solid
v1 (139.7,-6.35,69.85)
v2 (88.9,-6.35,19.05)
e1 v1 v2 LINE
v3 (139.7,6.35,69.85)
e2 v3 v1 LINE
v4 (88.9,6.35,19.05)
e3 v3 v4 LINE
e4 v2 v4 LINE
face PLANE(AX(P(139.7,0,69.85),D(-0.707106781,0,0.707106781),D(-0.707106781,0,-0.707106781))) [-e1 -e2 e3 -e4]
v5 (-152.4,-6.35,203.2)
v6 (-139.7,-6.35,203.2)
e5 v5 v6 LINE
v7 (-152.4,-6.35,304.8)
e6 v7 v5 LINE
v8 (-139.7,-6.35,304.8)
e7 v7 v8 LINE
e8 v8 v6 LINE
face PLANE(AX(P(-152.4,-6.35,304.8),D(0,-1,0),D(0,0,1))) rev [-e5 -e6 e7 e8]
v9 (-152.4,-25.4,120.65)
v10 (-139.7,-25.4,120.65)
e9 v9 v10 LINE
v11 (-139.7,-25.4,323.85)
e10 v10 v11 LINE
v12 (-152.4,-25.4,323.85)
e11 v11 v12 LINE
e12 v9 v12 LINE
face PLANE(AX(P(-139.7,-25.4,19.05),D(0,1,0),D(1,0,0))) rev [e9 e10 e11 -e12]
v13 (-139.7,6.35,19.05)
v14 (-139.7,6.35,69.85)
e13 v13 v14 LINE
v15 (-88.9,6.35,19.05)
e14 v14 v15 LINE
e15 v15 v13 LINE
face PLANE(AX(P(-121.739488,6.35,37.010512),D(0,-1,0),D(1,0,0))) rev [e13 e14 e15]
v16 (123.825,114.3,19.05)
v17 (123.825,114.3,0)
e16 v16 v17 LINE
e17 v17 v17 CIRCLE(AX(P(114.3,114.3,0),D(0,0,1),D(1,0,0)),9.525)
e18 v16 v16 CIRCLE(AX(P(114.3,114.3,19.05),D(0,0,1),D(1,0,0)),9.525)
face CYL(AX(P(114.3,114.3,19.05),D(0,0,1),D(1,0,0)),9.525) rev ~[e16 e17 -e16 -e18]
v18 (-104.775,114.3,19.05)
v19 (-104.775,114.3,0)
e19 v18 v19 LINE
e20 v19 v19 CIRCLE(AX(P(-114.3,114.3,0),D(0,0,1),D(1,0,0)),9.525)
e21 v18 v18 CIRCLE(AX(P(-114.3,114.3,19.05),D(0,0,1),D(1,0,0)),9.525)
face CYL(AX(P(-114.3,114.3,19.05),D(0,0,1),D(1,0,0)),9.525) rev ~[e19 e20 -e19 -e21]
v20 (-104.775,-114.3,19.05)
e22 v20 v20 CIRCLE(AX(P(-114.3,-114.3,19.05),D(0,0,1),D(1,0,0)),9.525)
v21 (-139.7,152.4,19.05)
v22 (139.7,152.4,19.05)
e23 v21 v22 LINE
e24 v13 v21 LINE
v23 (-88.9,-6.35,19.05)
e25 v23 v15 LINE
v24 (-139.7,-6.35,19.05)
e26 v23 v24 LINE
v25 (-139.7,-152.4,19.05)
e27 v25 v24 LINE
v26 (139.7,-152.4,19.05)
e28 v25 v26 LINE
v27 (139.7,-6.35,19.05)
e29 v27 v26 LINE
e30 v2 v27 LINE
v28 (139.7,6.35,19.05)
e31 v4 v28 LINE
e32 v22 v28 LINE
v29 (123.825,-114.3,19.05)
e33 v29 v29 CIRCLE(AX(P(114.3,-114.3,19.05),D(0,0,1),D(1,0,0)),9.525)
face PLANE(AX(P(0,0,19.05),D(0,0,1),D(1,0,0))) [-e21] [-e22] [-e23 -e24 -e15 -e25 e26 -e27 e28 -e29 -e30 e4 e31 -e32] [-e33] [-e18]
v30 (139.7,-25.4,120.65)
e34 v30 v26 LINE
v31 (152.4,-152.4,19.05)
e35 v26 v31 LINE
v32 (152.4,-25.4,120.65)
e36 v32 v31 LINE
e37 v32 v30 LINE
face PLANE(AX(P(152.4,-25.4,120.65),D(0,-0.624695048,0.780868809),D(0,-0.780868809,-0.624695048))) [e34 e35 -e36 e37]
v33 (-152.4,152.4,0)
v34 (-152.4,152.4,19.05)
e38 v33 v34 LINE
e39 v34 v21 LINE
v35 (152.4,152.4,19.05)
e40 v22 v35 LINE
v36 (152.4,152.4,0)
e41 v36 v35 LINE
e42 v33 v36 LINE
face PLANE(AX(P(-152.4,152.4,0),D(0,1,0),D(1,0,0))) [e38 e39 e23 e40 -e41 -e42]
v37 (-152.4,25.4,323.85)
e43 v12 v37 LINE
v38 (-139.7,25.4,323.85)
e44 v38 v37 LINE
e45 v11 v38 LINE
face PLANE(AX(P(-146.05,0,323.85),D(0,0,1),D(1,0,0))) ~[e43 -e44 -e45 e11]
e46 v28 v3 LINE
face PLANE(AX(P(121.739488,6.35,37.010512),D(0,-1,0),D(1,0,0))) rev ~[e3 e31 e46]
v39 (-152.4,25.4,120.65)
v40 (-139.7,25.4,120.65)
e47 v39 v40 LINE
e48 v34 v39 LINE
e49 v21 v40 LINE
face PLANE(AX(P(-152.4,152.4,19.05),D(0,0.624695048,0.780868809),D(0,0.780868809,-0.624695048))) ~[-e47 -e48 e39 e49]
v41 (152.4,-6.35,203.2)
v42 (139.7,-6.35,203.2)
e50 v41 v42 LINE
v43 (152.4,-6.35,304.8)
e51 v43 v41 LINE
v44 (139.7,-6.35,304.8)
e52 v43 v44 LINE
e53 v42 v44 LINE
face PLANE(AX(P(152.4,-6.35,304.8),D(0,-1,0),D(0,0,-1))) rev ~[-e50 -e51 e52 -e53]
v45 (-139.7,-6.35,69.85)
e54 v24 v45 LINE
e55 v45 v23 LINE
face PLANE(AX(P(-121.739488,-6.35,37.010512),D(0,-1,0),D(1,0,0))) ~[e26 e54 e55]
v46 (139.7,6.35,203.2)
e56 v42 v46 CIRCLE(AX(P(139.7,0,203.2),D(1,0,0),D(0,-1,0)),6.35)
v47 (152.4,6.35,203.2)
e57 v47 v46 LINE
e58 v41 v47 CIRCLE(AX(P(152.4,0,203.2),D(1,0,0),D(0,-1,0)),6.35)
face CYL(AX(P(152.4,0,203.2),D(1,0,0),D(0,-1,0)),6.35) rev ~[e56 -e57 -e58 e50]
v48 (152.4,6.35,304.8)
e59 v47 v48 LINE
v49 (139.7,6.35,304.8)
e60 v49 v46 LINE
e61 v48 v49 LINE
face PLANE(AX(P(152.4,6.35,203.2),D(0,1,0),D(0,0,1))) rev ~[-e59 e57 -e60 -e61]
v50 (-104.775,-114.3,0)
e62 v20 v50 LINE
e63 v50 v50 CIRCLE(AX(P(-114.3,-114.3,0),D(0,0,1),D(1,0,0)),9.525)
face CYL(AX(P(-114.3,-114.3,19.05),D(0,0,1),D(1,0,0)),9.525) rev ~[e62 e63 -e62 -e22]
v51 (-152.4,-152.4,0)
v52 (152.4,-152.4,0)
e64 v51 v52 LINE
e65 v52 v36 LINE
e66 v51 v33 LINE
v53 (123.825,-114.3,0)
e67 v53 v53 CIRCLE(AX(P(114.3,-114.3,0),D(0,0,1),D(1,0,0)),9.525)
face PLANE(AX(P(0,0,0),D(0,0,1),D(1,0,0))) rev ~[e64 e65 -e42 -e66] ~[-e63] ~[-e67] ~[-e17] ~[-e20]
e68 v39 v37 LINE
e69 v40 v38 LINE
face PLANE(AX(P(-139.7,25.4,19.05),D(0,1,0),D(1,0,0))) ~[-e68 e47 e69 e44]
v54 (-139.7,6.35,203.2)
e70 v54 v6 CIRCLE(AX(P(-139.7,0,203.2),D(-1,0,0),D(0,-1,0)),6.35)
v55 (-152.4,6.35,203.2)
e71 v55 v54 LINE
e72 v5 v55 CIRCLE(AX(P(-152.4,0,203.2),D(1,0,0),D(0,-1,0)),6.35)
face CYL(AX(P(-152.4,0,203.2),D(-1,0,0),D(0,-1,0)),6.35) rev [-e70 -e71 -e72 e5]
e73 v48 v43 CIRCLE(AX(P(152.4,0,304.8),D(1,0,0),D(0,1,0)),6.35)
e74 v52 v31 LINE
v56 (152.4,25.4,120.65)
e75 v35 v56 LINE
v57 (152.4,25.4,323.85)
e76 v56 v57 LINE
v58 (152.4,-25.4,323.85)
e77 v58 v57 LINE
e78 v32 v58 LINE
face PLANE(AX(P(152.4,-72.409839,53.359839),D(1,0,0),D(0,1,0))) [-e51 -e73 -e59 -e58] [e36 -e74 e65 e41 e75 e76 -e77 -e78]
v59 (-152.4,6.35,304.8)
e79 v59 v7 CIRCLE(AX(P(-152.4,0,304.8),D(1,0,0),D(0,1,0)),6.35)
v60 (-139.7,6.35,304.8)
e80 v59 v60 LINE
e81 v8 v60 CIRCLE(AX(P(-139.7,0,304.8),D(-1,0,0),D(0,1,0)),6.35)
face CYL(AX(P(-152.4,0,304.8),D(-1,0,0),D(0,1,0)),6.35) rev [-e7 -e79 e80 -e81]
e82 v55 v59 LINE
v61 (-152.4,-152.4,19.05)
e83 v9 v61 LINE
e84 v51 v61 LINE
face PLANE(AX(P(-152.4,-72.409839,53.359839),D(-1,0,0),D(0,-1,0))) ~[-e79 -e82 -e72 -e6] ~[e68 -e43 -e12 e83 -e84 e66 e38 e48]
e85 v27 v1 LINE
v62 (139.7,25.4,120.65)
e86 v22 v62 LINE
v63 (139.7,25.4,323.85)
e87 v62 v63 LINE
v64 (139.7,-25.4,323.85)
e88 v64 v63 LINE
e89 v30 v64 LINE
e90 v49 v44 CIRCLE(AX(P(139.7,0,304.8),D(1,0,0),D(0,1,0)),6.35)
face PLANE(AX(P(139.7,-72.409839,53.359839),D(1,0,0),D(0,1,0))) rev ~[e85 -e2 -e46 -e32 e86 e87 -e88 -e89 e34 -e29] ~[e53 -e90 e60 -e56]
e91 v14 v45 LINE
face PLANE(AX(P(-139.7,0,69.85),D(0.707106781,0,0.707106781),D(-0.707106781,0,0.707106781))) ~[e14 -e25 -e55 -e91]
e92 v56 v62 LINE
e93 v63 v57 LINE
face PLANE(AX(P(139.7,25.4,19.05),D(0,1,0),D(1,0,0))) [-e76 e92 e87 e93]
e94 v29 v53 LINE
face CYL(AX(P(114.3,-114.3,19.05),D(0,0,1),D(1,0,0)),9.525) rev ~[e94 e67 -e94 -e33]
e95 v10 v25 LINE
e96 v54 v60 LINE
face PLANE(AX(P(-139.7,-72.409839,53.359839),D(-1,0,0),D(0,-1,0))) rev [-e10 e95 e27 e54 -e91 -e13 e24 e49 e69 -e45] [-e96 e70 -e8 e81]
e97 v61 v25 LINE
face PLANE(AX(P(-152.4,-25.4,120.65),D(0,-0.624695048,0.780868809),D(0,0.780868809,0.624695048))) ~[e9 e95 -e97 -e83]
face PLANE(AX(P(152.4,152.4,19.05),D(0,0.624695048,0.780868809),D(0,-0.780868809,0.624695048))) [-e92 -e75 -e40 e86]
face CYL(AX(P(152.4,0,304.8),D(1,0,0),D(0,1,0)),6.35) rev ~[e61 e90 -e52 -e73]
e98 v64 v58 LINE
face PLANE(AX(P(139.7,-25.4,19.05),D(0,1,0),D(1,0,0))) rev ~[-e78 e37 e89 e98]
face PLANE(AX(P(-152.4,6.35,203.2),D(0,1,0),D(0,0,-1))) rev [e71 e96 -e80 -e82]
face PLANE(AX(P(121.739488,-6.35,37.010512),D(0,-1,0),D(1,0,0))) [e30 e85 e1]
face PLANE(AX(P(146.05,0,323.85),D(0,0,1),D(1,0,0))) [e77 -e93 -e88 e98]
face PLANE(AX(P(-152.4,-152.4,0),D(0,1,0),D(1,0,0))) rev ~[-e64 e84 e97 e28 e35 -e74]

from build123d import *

# Parameters (mm, degrees)
F0_W      = 304.8
F0_H      = 304.8
F1_DEPTH  = 19.05
F2_W      = 12.7
F2_H      = 50.8
F3_DEPTH  = 304.8
F5_DEPTH  = 25.4
F7_DEPTH  = 6.35
F9_DEPTH  = 12.7
F10_R     = 9.525
F11_DEPTH = 25.4


# Not quite as in the source:
# - a pattern or mirror of a feature is missing from the dataset's text; its kind, count and spacing are read off the source's solid


with BuildPart() as f1:
    # F0 (on Top) → F1 (new body)
    with BuildSketch(Plane.XY):
        Rectangle(F0_W, F0_H)
    extrude(amount=F1_DEPTH)

    # F2 (on face) → F3 (join)
    with BuildSketch(Plane.XY.offset(19.05)):
        with Locations((146.05, 0)):
            Rectangle(F2_W, F2_H)
    f3 = extrude(amount=F3_DEPTH)

    # F3_copies: F3 across plane
    add(f3.mirror(Plane(origin=(0, 0, 0), x_dir=(0, 0, -1), z_dir=(-1, 0, 0))))

    # F4 (on face) → F5 (cut)
    with BuildSketch(Plane.YZ.offset(152.4)):
        with BuildLine():
            Line((6.35, 203.2), (6.35, 304.8))
            ThreePointArc((6.35, 304.8), (0, 311.15), (-6.35, 304.8))
            Line((-6.35, 304.8), (-6.35, 203.2))
            ThreePointArc((-6.35, 203.2), (0, 196.85), (6.35, 203.2))
        make_face()
    f5 = extrude(amount=-F5_DEPTH, mode=Mode.SUBTRACT)

    # F5_copies: F5 across plane
    add(f5.mirror(Plane(origin=(0, 0, 0), x_dir=(0, 0, -1), z_dir=(-1, 0, 0))), mode=Mode.SUBTRACT)

    # F6 (on Front) → F7 (join, symmetric)
    with BuildSketch(Plane.XZ):
        Polygon((139.7, 19.05), (139.7, 69.85), (88.9, 19.05), align=None)
    f7 = extrude(amount=F7_DEPTH, both=True)

    # F7_copies: F7 across plane
    add(f7.mirror(Plane(origin=(0, 0, 0), x_dir=(0, 0, -1), z_dir=(-1, 0, 0))))

    # F8 (on face) → F9 (join)
    with BuildSketch(Plane.YZ.offset(152.4)):
        Polygon((-25.4, 120.65), (-152.4, 19.05), (-25.4, 19.05), align=None)
        Polygon((152.4, 19.05), (25.4, 120.65), (25.4, 19.05), align=None)
    f9 = extrude(amount=-F9_DEPTH)

    # F9_copies: F9 across plane
    add(f9.mirror(Plane(origin=(0, 0, 0), x_dir=(0, 0, -1), z_dir=(-1, 0, 0))))

    # F10 (on face) → F11 (cut)
    with BuildSketch(Plane.XY.offset(19.05)):
        with Locations((-114.3, 114.3)):
            Circle(F10_R)
        with Locations((114.3, 114.3)):
            Circle(F10_R)
        with Locations((114.3, -114.3)):
            Circle(F10_R)
        with Locations((-114.3, -114.3)):
            Circle(F10_R)
    extrude(amount=-F11_DEPTH, mode=Mode.SUBTRACT)


solid = f1.part
